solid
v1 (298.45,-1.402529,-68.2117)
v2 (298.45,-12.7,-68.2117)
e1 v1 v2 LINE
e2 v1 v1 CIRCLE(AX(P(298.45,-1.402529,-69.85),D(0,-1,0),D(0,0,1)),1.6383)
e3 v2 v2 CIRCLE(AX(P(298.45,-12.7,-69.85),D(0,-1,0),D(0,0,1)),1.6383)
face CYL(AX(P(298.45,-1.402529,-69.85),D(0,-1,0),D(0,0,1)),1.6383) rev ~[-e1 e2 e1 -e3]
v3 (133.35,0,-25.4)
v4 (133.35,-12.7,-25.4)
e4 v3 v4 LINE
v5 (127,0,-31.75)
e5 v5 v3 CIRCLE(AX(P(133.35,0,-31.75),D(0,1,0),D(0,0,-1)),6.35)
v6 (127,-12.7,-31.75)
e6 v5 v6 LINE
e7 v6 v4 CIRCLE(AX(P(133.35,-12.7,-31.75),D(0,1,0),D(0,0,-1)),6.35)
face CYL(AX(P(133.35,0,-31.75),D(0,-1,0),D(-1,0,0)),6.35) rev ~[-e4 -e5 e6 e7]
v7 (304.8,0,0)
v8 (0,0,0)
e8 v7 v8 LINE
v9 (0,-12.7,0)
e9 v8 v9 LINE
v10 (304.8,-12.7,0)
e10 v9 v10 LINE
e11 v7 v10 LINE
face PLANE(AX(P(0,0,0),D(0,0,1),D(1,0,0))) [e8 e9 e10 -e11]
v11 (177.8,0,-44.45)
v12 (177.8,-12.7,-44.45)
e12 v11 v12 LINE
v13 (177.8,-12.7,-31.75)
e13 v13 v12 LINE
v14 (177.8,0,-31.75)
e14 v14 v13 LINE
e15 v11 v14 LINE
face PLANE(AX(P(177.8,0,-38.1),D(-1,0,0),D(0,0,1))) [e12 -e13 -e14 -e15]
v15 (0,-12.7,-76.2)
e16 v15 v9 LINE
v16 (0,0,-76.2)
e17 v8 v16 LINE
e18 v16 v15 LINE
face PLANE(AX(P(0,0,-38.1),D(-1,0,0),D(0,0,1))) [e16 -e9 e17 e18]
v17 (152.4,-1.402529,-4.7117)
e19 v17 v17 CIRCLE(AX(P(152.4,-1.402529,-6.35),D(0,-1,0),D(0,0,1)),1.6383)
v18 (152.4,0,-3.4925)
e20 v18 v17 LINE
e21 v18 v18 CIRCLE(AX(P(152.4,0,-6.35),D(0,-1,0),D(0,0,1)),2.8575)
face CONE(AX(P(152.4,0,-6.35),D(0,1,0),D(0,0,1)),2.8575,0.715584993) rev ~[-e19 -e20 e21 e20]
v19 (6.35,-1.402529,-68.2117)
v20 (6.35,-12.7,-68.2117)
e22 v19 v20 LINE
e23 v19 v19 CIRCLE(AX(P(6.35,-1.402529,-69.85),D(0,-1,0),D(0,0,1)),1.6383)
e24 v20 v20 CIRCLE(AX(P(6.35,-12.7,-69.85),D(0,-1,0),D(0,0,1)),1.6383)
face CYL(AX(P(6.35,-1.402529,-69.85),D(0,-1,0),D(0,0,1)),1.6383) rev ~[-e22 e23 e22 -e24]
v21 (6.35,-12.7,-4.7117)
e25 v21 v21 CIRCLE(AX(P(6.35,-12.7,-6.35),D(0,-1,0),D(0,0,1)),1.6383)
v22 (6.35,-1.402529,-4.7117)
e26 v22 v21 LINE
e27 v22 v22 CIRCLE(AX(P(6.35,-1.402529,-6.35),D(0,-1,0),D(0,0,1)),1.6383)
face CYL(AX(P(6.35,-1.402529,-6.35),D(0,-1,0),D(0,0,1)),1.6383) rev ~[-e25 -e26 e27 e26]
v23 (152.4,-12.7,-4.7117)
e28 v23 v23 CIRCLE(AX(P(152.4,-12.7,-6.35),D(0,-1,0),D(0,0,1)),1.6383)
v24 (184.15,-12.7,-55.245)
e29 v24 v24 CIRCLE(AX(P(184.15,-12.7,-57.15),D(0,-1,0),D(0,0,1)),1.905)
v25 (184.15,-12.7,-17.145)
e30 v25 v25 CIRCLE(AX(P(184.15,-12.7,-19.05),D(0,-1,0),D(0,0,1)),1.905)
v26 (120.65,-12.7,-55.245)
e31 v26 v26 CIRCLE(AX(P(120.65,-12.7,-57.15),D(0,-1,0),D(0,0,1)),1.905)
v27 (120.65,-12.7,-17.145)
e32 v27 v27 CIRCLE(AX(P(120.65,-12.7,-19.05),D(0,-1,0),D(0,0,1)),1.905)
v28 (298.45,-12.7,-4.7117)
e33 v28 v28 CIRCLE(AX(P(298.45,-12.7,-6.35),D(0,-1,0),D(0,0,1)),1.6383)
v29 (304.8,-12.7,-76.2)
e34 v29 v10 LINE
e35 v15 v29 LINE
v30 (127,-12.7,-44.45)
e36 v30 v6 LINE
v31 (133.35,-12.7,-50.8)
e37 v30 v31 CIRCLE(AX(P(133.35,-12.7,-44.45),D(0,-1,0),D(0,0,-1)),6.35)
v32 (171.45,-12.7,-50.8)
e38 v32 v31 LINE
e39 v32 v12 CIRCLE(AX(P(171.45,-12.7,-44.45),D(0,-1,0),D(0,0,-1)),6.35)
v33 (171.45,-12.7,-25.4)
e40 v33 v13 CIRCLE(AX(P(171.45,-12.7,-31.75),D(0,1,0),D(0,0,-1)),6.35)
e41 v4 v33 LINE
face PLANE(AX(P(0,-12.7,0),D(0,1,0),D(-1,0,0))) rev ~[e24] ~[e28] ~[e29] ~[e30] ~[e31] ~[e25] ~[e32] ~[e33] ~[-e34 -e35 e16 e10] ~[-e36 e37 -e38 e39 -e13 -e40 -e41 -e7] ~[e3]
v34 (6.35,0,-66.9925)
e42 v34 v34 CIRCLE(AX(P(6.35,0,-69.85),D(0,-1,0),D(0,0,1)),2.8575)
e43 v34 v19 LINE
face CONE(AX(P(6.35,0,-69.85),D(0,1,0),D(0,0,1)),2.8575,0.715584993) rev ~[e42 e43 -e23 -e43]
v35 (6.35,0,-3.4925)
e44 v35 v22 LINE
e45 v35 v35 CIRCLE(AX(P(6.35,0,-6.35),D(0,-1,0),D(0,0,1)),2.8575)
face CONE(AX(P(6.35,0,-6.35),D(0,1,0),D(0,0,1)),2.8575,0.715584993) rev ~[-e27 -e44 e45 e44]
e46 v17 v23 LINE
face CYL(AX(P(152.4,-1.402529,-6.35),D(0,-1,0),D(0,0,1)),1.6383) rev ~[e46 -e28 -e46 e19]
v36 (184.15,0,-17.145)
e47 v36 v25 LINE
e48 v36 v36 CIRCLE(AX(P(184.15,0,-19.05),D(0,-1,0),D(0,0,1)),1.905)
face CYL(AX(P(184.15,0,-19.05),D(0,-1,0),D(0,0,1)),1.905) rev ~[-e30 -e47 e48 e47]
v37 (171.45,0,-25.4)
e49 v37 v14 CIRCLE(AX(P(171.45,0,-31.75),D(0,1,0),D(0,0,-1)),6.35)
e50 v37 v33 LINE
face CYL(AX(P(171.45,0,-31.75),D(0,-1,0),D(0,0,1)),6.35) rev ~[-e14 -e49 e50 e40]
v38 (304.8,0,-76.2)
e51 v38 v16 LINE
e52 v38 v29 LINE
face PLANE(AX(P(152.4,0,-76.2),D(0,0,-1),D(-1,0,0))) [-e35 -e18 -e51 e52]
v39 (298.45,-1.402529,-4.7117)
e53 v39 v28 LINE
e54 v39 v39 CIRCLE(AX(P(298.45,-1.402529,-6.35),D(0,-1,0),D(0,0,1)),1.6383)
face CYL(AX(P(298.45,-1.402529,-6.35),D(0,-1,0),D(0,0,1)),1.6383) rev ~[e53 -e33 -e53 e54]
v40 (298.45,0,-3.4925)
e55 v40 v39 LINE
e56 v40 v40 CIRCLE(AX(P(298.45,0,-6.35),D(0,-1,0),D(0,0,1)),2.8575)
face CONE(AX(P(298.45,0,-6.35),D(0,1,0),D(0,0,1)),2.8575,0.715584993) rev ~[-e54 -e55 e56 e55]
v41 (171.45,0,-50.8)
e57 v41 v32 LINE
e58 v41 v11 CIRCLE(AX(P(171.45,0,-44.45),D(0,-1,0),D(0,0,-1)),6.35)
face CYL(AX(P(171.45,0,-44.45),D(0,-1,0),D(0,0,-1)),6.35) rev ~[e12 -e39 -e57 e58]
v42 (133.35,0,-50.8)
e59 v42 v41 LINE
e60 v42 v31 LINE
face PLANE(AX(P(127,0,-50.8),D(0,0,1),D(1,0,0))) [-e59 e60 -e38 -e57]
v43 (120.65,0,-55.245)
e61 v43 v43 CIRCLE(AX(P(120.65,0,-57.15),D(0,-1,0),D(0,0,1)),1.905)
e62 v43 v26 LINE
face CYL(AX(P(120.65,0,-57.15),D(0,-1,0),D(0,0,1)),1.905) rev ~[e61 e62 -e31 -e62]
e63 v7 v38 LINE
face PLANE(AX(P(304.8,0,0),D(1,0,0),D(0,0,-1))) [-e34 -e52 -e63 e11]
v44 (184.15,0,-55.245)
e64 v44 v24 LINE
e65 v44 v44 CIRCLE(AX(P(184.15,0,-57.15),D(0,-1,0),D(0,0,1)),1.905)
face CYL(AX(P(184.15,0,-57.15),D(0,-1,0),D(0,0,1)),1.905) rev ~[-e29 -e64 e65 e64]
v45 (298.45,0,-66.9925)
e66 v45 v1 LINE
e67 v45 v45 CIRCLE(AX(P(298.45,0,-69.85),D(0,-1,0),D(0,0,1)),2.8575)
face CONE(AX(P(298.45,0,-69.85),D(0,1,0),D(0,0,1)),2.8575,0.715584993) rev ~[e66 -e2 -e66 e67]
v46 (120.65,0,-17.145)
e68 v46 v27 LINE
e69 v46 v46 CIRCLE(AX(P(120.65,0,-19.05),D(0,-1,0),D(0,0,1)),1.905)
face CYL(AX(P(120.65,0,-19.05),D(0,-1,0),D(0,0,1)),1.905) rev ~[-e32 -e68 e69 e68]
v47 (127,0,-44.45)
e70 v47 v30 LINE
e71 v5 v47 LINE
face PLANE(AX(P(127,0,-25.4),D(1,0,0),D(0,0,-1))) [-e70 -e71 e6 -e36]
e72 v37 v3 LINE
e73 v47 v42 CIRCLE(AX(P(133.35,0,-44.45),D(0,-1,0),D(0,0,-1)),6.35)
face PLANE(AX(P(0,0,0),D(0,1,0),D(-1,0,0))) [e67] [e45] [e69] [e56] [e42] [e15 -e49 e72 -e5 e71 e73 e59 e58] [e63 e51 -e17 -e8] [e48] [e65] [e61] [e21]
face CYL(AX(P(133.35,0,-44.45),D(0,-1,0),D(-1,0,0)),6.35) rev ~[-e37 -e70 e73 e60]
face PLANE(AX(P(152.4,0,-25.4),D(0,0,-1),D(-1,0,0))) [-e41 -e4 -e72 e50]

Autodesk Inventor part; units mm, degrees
ref_plane "YZ Plane" through (0, 0, 0) normal (1, 0, 0) x (0, 1, 0)
ref_plane "XZ Plane" through (0, 0, 0) normal (0, 1, 0) x (-1, 0, 0)
ref_plane "XY Plane" through (0, 0, 0) normal (0, 0, 1) x (1, 0, 0)
sketch "Sketch1" plane through (0, 0, 0) normal (0, 1, 0) x (-1, 0, 0)
  line L0 (0, 0) -> (-304.8, 0)
  line L1 (-304.8, 0) -> (-304.8, -76.2)
  line L2 (-304.8, -76.2) -> (0, -76.2)
  line L3 (0, -76.2) -> (0, 0)
  line L4 (-152.4, -76.2) -> (-152.4, 0)
  line L5 (-304.8, -38.1) -> (0, -38.1)
  line L6 (-127, -50.8) -> (-177.8, -50.8)
  line L7 (-177.8, -50.8) -> (-177.8, -25.4)
  line L8 (-177.8, -25.4) -> (-127, -25.4)
  line L9 (-127, -25.4) -> (-127, -50.8)
  line L10 (-127, -50.8) -> (-177.8, -25.4) construction
  line L11 (-177.8, -50.8) -> (-127, -25.4) construction
  line L12 (-120.65, -57.15) -> (-184.15, -57.15) construction
  line L13 (-184.15, -57.15) -> (-184.15, -19.05) construction
  line L14 (-184.15, -19.05) -> (-120.65, -19.05) construction
  line L15 (-120.65, -19.05) -> (-120.65, -57.15) construction
  circle A0 centre (-120.65, -57.15) radius 1.5875
  circle A1 centre (-184.15, -57.15) radius 1.5875
  circle A2 centre (-120.65, -19.05) radius 1.5875
  circle A3 centre (-184.15, -19.05) radius 1.5875
  point P0 (-6.35, -69.85)
  point P1 (-152.4, -38.1)
  point P2 (-6.35, -69.85)
  point P3 (-298.45, -69.85)
  point P4 (-6.35, -6.35)
  point P5 (-298.45, -6.35)
  point P6 (-152.4, -6.35)
  dimension "d0" = 76.2
  dimension "d1" = 304.8
  dimension "d5" = 6.35
  dimension "d6" = 6.35
  dimension "d16" = 50.8
  dimension "d17" = 25.4
  dimension "d19" = 6.35
  dimension "d20" = 3.175
extrude "Extrusion1" add sketch "Sketch1" against normal blind 12.7 contours L3 L5 L9 L8 L4 L0 | L4 L8 L7 L5 L1 L0 | L3 L2 L4 L6 L9 L5 | L5 L7 L6 L4 L2 L1 | A0 | A1 | A2 | A3
hole "Mounting Hole" at (6.35, 0, -69.85) direction (0, -1, 0) diameter 3.2766 end through all countersink diameter 5.715 countersink angle 82 clearance for "Flat Head Machine Screw (82)" size "#4" standard "Ansi Unified Screw Threads"
pattern_sketch "Mounting Holes" of "Mounting Hole" from (6.35, 0, -69.85) copies at (298.45, 0, -69.85) at (298.45, 0, -6.35) at (6.35, 0, -6.35) at (152.4, 0, -6.35)
sketch "Sketch2" plane through (0, 0, 0) normal (0, 1, 0) x (1, 0, 0)
  point P0 (120.65, 57.15)
  point P1 (120.65, 19.05)
  point P2 (184.15, 19.05)
  point P3 (184.15, 57.15)
hole "Jack Plate Mounting" at (120.65, 0, -57.15) direction (0, -1, 0) diameter 3.81 end through all clearance for "Flat Head Machine Screw (82)" size "#6" standard "Ansi Unified Screw Threads"
pattern_sketch "Jack Plate Mounting Holes" of "Jack Plate Mounting" from (120.65, 0, -57.15) copies at (120.65, 0, -19.05) at (184.15, 0, -19.05) at (184.15, 0, -57.15)
fillet "Fillet1" radius 6.35 4 edges at (127, -6.35, -50.8) (127, -6.35, -25.4) (177.8, -6.35, -25.4) (177.8, -6.35, -50.8)
properties material "MDF Medium Density Fiberboard"
